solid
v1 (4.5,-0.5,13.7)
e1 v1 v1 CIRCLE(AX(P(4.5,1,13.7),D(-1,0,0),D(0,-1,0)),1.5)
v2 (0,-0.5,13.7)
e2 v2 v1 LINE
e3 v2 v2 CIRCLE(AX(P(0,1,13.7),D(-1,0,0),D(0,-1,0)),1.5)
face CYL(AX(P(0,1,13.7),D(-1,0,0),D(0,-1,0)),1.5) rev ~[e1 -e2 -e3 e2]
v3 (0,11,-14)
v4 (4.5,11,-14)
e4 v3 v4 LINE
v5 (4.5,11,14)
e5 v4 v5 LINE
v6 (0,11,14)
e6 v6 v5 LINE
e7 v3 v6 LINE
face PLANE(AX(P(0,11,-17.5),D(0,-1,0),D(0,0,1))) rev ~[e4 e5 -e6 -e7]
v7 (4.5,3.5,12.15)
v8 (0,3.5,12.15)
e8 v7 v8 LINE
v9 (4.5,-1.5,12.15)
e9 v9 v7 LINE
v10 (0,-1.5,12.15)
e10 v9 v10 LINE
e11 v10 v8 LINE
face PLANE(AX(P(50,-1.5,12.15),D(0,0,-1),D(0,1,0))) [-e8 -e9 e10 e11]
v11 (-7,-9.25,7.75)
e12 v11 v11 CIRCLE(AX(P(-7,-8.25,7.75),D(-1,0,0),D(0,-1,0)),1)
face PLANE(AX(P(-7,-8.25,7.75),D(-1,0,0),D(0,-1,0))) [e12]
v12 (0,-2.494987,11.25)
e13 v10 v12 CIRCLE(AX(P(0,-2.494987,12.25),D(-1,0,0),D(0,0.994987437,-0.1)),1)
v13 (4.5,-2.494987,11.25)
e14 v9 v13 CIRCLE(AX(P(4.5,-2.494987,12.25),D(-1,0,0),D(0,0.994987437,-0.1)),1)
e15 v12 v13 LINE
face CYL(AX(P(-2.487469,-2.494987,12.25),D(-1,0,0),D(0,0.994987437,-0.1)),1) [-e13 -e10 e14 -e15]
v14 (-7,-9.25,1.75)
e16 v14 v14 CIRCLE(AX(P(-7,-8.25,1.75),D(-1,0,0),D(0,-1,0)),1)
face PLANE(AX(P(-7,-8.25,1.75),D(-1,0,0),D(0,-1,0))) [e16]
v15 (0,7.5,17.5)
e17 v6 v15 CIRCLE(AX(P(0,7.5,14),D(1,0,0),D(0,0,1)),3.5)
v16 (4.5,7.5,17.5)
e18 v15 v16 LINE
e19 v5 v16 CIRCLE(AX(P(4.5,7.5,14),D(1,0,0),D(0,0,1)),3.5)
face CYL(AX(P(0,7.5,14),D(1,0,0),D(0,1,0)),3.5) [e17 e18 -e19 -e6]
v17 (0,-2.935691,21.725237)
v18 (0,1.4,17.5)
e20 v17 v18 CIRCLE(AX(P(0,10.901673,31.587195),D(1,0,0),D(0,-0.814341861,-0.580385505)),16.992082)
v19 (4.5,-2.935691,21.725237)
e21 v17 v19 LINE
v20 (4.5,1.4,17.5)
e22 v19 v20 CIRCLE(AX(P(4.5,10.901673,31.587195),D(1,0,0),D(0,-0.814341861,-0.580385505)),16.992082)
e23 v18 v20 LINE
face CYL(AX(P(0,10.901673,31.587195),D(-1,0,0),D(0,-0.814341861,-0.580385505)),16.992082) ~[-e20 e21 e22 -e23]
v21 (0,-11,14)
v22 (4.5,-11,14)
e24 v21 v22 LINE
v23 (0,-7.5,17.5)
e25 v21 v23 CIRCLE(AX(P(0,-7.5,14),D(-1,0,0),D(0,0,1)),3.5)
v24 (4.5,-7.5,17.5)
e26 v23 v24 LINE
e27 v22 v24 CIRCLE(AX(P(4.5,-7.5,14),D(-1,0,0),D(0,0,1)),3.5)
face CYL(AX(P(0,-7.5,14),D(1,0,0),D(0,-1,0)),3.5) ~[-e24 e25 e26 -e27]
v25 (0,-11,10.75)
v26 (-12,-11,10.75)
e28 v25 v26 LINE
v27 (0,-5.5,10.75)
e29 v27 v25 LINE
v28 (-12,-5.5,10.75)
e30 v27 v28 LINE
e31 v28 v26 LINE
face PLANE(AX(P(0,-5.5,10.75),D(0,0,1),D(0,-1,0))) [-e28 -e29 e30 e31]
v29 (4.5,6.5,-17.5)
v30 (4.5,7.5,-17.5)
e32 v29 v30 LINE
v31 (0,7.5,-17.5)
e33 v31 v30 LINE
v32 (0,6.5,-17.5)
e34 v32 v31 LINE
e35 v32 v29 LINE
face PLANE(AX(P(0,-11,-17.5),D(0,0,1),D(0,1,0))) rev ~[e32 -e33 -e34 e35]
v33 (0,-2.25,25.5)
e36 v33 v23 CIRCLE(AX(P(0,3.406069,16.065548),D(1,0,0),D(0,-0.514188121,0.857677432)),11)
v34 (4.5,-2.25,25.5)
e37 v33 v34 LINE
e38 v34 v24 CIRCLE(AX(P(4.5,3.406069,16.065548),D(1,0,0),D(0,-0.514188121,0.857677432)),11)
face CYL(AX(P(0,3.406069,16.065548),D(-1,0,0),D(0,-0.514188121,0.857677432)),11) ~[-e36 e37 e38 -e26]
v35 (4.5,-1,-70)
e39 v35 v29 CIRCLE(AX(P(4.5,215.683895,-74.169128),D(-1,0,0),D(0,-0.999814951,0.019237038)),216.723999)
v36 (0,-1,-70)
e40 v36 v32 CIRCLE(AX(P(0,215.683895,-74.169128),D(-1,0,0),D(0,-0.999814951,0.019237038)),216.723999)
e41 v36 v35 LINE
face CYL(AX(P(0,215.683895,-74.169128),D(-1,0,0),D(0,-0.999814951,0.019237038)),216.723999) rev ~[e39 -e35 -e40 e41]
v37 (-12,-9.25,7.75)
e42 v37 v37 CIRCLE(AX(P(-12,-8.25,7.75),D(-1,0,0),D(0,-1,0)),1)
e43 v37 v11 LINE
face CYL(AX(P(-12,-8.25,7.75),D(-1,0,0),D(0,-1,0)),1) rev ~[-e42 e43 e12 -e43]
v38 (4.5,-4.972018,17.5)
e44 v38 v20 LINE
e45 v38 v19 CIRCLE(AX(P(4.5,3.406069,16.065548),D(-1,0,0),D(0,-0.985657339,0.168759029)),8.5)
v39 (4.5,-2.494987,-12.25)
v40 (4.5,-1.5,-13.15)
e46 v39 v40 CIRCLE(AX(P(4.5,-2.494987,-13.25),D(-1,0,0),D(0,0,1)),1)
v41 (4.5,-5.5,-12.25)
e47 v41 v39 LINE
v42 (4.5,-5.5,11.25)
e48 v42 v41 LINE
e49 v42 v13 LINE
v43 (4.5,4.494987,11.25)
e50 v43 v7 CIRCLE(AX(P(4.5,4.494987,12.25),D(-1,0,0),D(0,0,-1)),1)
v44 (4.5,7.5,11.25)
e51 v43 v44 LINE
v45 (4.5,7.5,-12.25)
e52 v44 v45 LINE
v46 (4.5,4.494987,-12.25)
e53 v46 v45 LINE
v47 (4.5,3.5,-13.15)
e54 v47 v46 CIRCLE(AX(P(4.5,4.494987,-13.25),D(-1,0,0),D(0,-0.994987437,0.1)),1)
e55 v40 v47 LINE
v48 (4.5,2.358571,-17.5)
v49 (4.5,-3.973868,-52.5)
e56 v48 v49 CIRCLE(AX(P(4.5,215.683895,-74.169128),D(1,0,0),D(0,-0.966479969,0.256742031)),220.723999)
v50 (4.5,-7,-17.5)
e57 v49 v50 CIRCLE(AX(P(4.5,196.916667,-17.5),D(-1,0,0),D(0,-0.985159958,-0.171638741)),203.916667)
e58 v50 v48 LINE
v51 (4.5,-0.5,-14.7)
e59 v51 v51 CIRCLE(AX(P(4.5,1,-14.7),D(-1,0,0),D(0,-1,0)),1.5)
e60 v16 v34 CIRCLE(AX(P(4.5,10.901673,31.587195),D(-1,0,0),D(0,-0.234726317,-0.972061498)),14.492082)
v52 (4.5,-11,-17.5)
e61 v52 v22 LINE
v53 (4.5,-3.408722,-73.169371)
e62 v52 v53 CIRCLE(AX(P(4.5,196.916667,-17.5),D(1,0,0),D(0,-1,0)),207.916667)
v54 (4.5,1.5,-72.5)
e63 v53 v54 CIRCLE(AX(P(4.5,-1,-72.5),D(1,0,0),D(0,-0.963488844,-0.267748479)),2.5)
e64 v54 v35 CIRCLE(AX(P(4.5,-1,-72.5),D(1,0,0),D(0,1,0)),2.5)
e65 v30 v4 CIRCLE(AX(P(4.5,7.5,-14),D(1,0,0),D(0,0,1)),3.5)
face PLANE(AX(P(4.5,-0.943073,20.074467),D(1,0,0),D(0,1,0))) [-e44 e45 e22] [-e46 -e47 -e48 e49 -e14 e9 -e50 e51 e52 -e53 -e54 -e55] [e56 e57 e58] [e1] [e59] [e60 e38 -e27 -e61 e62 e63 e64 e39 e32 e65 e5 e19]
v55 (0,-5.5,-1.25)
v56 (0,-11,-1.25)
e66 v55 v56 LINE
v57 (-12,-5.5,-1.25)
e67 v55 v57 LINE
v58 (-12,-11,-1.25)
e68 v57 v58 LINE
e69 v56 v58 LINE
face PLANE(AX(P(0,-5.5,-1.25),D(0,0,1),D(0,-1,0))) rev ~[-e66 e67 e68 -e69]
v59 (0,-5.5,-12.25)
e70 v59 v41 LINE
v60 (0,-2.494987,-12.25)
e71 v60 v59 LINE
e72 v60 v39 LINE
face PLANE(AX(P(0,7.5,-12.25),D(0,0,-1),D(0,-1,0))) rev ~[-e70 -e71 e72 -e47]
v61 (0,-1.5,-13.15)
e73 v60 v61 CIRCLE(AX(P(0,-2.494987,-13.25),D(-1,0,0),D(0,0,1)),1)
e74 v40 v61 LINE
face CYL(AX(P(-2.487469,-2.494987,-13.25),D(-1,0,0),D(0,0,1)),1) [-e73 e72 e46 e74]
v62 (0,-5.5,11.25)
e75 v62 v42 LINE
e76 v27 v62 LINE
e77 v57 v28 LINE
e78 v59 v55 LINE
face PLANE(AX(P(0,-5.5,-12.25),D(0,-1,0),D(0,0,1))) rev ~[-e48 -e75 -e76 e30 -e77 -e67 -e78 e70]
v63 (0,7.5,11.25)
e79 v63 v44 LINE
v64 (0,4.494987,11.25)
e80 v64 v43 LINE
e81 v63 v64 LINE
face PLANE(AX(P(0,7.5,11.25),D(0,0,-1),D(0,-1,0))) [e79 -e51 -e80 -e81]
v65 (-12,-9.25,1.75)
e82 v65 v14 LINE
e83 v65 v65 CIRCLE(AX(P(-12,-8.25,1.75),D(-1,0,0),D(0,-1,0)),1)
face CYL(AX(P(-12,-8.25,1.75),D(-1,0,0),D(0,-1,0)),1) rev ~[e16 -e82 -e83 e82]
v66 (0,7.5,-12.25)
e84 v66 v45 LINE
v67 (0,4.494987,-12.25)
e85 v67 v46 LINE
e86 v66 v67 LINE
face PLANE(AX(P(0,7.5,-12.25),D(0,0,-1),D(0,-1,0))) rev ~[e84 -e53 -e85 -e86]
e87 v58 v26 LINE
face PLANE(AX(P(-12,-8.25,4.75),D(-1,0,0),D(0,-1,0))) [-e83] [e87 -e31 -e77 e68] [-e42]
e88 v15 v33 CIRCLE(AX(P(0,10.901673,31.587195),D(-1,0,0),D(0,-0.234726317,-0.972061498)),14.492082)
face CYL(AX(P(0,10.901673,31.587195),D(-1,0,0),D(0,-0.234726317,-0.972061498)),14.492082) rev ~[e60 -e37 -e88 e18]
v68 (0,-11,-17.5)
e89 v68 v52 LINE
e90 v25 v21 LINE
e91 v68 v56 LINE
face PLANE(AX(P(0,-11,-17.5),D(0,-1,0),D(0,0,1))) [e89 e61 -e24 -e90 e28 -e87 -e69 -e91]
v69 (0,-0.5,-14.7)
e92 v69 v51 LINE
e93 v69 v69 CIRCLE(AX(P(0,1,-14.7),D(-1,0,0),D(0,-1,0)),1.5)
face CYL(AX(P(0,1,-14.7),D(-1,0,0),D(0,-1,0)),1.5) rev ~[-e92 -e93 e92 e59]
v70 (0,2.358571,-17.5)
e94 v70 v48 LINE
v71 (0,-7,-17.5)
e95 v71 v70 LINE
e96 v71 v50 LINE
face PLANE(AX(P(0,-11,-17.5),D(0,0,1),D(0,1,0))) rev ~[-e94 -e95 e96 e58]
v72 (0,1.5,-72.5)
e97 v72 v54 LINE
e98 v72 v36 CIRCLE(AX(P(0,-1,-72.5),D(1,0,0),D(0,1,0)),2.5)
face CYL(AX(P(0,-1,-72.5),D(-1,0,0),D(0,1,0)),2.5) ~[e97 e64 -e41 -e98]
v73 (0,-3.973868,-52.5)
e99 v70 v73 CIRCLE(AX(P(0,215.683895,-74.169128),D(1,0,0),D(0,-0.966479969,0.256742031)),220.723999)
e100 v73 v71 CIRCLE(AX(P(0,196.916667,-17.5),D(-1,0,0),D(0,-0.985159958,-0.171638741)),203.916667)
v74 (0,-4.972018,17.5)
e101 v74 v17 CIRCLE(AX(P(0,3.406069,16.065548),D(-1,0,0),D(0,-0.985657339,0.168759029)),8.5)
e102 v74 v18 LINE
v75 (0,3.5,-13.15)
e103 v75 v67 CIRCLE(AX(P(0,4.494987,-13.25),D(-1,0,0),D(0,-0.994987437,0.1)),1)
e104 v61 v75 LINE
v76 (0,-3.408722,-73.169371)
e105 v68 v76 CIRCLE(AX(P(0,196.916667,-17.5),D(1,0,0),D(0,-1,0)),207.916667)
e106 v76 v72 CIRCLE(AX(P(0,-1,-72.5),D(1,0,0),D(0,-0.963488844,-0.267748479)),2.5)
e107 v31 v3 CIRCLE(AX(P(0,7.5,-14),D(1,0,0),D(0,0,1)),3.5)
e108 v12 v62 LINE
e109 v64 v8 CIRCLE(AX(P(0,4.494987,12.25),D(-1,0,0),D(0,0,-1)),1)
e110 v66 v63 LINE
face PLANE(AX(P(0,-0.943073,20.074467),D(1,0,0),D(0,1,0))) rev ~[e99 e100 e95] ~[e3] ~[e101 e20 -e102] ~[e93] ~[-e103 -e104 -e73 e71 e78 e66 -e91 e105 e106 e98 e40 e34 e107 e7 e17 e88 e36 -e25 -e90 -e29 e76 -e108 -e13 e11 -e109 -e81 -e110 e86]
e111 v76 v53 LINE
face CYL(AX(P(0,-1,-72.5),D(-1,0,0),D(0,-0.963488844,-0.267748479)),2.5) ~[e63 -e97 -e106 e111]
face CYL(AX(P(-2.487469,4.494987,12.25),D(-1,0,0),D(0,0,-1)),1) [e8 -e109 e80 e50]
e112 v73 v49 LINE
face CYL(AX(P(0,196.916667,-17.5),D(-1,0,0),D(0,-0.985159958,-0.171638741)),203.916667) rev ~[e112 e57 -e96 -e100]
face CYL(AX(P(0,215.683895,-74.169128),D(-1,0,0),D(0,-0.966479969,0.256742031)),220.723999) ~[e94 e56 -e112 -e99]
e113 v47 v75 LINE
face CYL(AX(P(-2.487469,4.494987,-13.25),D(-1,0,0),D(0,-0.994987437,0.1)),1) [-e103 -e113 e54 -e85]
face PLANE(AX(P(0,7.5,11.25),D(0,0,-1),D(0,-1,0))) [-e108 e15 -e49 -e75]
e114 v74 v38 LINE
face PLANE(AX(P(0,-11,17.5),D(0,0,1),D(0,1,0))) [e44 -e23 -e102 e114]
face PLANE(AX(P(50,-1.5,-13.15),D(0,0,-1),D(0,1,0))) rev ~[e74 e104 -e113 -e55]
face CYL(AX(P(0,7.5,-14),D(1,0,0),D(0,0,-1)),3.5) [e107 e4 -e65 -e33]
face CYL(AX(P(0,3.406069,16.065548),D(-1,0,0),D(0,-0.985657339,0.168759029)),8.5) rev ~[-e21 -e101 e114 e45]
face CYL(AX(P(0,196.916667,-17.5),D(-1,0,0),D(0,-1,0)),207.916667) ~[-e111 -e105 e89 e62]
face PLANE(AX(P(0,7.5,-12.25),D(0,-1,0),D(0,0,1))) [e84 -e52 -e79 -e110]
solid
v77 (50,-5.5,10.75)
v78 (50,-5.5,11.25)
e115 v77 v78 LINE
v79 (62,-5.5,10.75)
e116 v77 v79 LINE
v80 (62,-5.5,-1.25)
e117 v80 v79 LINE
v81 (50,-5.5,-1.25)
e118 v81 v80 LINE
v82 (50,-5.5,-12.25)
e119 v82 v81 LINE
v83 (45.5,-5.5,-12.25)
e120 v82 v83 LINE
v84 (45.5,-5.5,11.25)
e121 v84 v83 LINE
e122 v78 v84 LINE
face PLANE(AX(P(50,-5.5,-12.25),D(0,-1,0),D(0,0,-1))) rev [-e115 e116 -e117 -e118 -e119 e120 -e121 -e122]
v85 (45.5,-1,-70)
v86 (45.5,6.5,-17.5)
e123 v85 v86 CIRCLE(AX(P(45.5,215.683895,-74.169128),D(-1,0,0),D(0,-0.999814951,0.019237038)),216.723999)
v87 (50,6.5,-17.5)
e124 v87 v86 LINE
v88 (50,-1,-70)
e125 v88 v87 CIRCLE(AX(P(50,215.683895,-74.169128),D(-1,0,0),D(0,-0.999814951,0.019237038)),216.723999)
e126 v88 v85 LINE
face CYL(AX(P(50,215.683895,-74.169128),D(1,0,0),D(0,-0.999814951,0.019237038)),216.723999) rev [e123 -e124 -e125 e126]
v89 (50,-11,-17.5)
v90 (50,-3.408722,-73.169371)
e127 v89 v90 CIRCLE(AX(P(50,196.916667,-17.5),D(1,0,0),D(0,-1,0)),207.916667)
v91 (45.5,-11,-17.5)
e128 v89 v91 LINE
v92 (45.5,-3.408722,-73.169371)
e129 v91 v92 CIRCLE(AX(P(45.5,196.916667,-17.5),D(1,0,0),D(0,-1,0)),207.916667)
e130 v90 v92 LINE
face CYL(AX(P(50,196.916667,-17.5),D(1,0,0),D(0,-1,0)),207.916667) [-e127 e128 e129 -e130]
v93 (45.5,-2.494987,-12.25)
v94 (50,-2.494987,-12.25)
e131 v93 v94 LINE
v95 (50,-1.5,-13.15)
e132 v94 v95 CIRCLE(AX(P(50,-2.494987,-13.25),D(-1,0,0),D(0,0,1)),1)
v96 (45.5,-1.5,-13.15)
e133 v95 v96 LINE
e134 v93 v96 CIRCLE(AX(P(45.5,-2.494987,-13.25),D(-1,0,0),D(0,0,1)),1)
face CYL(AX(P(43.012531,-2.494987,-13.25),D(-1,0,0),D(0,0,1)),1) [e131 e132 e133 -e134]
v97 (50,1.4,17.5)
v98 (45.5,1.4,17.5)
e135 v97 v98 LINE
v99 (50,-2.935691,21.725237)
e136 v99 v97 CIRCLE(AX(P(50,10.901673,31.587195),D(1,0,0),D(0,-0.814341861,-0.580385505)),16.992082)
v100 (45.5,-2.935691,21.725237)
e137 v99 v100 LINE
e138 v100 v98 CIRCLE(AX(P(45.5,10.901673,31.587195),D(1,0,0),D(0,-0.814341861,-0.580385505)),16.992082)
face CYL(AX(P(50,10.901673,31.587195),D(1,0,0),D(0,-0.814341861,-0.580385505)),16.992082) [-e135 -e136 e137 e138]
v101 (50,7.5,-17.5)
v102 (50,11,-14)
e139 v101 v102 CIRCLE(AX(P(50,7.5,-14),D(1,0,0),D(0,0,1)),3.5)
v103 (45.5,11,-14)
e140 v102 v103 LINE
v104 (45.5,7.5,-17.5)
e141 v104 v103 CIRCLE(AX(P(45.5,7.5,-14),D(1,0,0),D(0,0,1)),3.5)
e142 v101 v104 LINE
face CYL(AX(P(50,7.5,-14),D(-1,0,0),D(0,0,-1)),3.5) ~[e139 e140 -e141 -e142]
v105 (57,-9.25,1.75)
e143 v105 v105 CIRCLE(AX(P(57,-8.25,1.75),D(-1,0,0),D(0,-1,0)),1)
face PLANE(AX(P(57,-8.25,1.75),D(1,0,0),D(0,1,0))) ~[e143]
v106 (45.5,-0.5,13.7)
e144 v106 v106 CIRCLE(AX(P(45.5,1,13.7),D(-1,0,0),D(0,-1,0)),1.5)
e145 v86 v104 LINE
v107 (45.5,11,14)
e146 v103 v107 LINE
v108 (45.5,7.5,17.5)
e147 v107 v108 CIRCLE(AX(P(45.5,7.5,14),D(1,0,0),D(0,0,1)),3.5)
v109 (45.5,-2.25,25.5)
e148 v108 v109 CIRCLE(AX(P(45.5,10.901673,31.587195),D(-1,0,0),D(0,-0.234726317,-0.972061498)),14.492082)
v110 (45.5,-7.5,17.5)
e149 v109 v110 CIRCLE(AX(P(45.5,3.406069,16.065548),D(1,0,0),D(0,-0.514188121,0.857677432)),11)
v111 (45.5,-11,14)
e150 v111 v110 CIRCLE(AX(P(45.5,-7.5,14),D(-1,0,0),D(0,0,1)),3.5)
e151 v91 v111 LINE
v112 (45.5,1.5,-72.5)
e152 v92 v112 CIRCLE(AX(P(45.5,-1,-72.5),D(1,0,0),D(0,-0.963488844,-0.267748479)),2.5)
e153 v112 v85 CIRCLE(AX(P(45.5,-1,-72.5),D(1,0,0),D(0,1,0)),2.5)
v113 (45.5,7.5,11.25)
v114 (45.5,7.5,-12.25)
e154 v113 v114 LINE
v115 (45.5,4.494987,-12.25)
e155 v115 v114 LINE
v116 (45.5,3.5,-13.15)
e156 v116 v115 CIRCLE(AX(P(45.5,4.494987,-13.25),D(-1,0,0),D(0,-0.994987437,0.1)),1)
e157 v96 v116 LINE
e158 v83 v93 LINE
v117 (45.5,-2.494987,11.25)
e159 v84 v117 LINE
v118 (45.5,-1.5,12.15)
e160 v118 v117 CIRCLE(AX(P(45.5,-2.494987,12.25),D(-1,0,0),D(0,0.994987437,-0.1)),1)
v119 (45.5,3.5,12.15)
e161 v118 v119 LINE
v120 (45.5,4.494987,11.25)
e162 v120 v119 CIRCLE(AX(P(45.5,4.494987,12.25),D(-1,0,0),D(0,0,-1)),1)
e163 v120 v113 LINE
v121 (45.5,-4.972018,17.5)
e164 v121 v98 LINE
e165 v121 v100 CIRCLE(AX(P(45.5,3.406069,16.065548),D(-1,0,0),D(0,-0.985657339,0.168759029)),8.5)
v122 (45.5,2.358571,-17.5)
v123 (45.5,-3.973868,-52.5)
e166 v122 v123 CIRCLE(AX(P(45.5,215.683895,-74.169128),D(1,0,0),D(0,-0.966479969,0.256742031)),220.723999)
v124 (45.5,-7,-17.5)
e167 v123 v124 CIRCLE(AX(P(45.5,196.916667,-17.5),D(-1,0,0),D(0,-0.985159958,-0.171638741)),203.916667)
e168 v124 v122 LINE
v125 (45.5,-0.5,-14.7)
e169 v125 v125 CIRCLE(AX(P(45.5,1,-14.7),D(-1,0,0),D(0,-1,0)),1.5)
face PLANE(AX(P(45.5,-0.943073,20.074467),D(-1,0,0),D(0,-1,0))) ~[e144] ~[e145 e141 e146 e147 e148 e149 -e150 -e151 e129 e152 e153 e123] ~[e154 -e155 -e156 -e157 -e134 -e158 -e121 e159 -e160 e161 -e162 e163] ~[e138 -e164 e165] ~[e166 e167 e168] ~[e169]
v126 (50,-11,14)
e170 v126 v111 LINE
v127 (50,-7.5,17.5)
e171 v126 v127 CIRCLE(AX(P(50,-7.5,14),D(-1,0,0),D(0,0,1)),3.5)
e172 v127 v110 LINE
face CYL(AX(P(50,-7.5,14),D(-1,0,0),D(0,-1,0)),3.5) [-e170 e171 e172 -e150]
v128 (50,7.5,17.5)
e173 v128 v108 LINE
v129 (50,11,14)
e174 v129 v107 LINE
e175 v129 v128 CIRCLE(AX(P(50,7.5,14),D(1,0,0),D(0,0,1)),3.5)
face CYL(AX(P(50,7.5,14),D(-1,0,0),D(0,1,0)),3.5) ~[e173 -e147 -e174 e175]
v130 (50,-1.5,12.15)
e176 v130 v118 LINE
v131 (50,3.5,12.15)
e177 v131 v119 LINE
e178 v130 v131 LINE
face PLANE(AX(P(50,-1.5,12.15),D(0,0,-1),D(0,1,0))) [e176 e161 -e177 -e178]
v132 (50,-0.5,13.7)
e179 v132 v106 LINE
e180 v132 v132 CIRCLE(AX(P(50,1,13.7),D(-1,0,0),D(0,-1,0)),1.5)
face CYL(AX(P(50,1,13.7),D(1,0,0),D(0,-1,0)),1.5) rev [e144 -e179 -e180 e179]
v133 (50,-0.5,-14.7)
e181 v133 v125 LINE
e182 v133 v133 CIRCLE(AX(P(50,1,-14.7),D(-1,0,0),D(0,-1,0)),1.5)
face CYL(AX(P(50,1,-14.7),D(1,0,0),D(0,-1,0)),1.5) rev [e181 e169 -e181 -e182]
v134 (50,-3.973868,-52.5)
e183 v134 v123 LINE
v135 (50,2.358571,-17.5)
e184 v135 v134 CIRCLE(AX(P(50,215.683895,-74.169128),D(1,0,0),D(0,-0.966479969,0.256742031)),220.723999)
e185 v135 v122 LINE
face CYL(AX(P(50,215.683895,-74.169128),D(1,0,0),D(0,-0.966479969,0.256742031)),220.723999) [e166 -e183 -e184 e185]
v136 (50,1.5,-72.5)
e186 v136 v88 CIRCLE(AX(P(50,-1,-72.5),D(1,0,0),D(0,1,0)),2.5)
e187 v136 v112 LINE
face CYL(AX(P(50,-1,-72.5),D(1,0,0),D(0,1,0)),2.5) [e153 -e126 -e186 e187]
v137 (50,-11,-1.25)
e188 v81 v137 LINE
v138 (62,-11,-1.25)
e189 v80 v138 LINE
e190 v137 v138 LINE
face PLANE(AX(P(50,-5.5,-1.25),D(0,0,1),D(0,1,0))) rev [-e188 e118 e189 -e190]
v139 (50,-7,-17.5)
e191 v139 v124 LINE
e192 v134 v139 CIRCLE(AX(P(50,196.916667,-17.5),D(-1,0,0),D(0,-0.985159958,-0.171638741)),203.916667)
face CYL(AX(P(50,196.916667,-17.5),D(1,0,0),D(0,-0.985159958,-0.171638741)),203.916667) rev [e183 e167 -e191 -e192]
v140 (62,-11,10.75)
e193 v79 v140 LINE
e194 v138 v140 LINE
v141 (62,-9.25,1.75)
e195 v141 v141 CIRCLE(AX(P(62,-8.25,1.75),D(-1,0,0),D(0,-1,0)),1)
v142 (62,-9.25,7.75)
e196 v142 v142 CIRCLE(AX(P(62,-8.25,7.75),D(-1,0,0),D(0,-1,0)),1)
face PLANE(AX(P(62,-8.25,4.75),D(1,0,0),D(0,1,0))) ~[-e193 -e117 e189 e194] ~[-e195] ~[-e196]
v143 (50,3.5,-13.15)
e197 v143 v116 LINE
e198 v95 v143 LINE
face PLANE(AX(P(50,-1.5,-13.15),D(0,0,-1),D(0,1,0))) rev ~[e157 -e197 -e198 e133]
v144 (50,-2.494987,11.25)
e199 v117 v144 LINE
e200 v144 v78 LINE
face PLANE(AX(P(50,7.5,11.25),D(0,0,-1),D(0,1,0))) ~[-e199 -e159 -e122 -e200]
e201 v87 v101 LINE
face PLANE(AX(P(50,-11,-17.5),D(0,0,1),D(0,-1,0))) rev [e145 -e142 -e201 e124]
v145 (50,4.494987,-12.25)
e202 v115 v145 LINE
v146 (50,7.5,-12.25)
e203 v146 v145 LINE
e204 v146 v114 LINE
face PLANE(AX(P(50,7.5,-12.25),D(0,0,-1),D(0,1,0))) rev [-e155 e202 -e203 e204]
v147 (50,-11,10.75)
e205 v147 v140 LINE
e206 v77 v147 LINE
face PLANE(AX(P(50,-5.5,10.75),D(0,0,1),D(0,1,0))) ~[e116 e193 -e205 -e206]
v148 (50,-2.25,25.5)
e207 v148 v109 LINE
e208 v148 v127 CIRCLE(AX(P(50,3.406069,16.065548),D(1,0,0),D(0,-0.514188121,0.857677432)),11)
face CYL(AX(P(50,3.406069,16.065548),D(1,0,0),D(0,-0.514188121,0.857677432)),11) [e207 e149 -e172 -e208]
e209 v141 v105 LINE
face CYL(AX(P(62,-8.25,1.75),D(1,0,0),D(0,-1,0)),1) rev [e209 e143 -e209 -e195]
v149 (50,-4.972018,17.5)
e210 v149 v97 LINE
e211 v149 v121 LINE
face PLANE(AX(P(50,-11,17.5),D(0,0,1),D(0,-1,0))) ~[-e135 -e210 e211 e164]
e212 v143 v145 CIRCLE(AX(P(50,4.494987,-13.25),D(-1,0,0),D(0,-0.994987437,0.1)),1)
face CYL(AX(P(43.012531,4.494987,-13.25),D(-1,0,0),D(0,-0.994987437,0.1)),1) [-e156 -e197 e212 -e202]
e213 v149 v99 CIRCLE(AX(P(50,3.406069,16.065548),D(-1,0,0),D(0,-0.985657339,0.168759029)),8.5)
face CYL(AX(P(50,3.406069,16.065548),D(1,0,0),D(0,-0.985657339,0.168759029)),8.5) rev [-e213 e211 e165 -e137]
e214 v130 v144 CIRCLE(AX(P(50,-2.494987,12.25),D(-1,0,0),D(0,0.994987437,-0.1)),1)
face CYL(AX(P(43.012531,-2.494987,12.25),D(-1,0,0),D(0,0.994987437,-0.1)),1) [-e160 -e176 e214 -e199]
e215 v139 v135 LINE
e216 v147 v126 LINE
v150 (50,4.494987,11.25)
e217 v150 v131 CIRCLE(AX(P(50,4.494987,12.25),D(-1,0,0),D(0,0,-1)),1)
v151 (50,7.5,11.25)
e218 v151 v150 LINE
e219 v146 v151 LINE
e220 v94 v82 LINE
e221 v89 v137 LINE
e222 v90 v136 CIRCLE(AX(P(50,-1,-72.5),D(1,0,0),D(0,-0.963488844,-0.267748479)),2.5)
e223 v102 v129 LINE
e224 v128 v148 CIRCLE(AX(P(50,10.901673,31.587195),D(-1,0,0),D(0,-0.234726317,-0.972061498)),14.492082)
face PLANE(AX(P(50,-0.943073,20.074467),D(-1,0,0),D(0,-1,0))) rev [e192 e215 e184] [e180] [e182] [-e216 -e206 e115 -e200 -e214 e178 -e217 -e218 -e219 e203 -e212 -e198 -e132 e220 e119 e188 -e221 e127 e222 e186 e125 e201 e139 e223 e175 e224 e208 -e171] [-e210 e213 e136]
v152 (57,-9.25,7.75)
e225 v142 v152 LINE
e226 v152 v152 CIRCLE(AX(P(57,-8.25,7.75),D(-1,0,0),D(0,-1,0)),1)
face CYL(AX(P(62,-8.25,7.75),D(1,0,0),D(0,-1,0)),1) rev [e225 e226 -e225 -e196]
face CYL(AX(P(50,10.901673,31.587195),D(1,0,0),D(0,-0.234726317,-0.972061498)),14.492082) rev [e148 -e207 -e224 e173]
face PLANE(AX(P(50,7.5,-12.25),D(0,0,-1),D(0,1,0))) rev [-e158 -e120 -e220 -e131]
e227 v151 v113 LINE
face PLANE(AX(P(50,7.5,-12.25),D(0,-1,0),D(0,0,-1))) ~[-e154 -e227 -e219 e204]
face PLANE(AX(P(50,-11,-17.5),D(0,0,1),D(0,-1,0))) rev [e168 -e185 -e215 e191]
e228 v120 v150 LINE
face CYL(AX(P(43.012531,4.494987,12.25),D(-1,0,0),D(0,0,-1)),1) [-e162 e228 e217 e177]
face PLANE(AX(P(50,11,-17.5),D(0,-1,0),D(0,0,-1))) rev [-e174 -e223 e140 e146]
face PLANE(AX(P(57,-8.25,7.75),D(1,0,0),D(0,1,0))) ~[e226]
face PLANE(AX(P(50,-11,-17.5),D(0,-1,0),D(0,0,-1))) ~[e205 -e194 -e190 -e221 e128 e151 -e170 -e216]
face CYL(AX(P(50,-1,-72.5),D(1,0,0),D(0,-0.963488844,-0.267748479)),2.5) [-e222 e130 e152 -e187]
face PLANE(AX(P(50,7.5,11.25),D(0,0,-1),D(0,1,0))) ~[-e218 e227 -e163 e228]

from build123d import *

# Parameters (mm, degrees)
F0_W           = 22
F0_H           = 35
F1_DEPTH       = 4.5
F3_DEPTH       = 4.5
F4_R           = 3.5
F6_DEPTH       = 4.5
F7_W           = 5.5
F7_H           = 12
F8_DEPTH       = 12
F9_W           = 13
F9_H           = 23.5
F10_DEPTH      = 25
F11_R          = 1.5
F12_DEPTH      = 25
F13_R          = 1
F14_DEPTH      = 5
F17_W          = 5
F17_H          = 0.9
F18_DEPTH      = 60
F19_T1_DEPTH   = 9.4749371855
F19_2_T1_DEPTH = 9.4749371855


# Not quite as in the source:
# - a fillet or chamfer that OpenCascade refuses, or shapes differently, is made with other operations: its cross-section is extruded or revolved along the edge and cut away or added


with BuildPart() as f1:
    # F0 (on Right) → F1 (new body)
    with BuildSketch(Plane.YZ):
        Rectangle(F0_W, F0_H)
    extrude(amount=F1_DEPTH)

    # F2 (on Right) → F3 (join, through all)
    with BuildSketch(Plane.YZ):
        with BuildLine():
            ThreePointArc((-3.4087221095, -73.1693711968), (-2.9904054853, -70.9872918312), (-1, -70))
            ThreePointArc((-1, -70), (1.1380813831, -43.5197259119), (6.5, -17.5))
            Line((6.5, -17.5), (2.3585708498, -17.5))
            ThreePointArc((2.3585708498, -17.5), (-1.5137994024, -34.8722383779), (-3.9738680642, -52.5))
            ThreePointArc((-3.9738680642, -52.5), (-6.2420584126, -35.065288743), (-7, -17.5))
            Line((-7, -17.5), (-11, -17.5))
            ThreePointArc((-11, -17.5), (-9.0934391059, -45.5922871508), (-3.4087221095, -73.1693711968))
        make_face()
        with BuildLine():
            ThreePointArc((-3.4087221095, -73.1693711968), (-0.6622169882, -74.9770754201), (1.5, -72.5))
            ThreePointArc((1.5, -72.5), (0.767766953, -70.732233047), (-1, -70))
            ThreePointArc((-1, -70), (-2.9904054853, -70.9872918312), (-3.4087221095, -73.1693711968))
        make_face()
    extrude(amount=F3_DEPTH)

    # F4
    f4_edges = [f1.edges().sort_by_distance(p)[0] for p in [
        (2.25, -11, 17.5),
        (2.25, 11, 17.5),
        (2.25, 11, -17.5),
    ]]
    fillet(f4_edges, radius=F4_R)

    # F5 (on Right) → F6 (join, through all)
    with BuildSketch(Plane.YZ):
        with BuildLine():
            Line((1.4, 17.5), (7.5, 17.5))
            ThreePointArc((7.5, 17.5), (1.7091044965, 20.3837523551), (-2.25, 25.5))
            ThreePointArc((-2.25, 25.5), (-5.7904576912, 22.1007691099), (-7.5, 17.5))
            Line((-7.5, 17.5), (-4.9720180544, 17.5))
            ThreePointArc((-4.9720180544, 17.5), (-4.2510603876, 19.7558550861), (-2.9356909086, 21.7252370349))
            ThreePointArc((-2.9356909086, 21.7252370349), (-0.9575351482, 19.4179700576), (1.4, 17.5))
        make_face()
    extrude(amount=F6_DEPTH)

    # F7 (on face) → F8 (join)
    with BuildSketch(Plane(origin=(0, 0, 0), x_dir=(0, -1, 0), z_dir=(-1, 0, 0))):
        with Locations((8.25, 4.75)):
            Rectangle(F7_W, F7_H)
    extrude(amount=F8_DEPTH)

    # F9 (on face) → F10 (cut)
    with BuildSketch(Plane(origin=(0, 0, 0), x_dir=(0, -1, 0), z_dir=(-1, 0, 0))):
        with Locations((-1, -0.5)):
            Rectangle(F9_W, F9_H)
    extrude(amount=-F10_DEPTH, mode=Mode.SUBTRACT)

    # F11 (on face) → F12 (cut)
    with BuildSketch(Plane(origin=(0, 0, 0), x_dir=(0, -1, 0), z_dir=(-1, 0, 0))):
        with Locations((-1, 13.7)):
            Circle(F11_R)
        with Locations((-1, -14.7)):
            Circle(F11_R)
    extrude(amount=-F12_DEPTH, mode=Mode.SUBTRACT)

    # F13 (on face) → F14 (cut)
    with BuildSketch(Plane(origin=(-12, 0, 0), x_dir=(0, -1, 0), z_dir=(-1, 0, 0))):
        with Locations((8.25, 7.75)):
            Circle(F13_R)
        with Locations((8.25, 1.75)):
            Circle(F13_R)
    extrude(amount=-F14_DEPTH, mode=Mode.SUBTRACT)


with BuildPart() as f16_1:
    # F16: instance of F1
    add(f1.part.mirror(Plane.YZ.offset(25)))


with BuildPart() as f18_tool:
    # F17 (on face) → F18 (new body)
    with BuildSketch(Plane.YZ.offset(50)):
        with Locations((1, 11.7)):
            Rectangle(F17_W, F17_H)
        with Locations((1, -12.7)):
            Rectangle(F17_W, F17_H)
    extrude(amount=-F18_DEPTH)


with BuildPart() as f1_1:
    add(f1.part)

    # F18: cut by f18_tool
    add(f18_tool.part, mode=Mode.SUBTRACT)

    # F19: fillet of radius 1 on 4 edges, made by hand

    # F19_s2 → F19_t1 (cut)
    with BuildSketch(Plane.YZ.offset(-2.4874685928)):
        with BuildLine():
            ThreePointArc((-1.5, 12.15), (-1.8241670439, 11.5083801513), (-2.4949874371, 11.25))
            Line((-2.4949874371, 11.25), (-1.5, 11.25))
            Line((-1.5, 11.25), (-1.5, 12.15))
        make_face()
        with BuildLine():
            ThreePointArc((4.4949874371, 11.25), (3.8241670439, 11.5083801513), (3.5, 12.15))
            Line((3.5, 12.15), (3.5, 11.25))
            Line((3.5, 11.25), (4.4949874371, 11.25))
        make_face()
        with BuildLine():
            ThreePointArc((3.5, -13.15), (3.8241670439, -12.5083801513), (4.4949874371, -12.25))
            Line((4.4949874371, -12.25), (3.5, -12.25))
            Line((3.5, -12.25), (3.5, -13.15))
        make_face()
        with BuildLine():
            ThreePointArc((-2.4949874371, -12.25), (-1.8241670439, -12.5083801513), (-1.5, -13.15))
            Line((-1.5, -13.15), (-1.5, -12.25))
            Line((-1.5, -12.25), (-2.4949874371, -12.25))
        make_face()
    extrude(amount=F19_T1_DEPTH, mode=Mode.SUBTRACT)


with BuildPart() as f16_1_1:
    add(f16_1.part)

    # F18: cut by f18_tool
    add(f18_tool.part, mode=Mode.SUBTRACT)

    # F19#2: fillet of radius 1 on 4 edges, made by hand

    # F19_2_s2 → F19_2_t1 (cut)
    with BuildSketch(Plane.YZ.offset(43.0125314072)):
        with BuildLine():
            ThreePointArc((-1.5, 12.15), (-1.8241670439, 11.5083801513), (-2.4949874371, 11.25))
            Line((-2.4949874371, 11.25), (-1.5, 11.25))
            Line((-1.5, 11.25), (-1.5, 12.15))
        make_face()
        with BuildLine():
            ThreePointArc((4.4949874371, 11.25), (3.8241670439, 11.5083801513), (3.5, 12.15))
            Line((3.5, 12.15), (3.5, 11.25))
            Line((3.5, 11.25), (4.4949874371, 11.25))
        make_face()
        with BuildLine():
            ThreePointArc((-2.4949874371, -12.25), (-1.8241670439, -12.5083801513), (-1.5, -13.15))
            Line((-1.5, -13.15), (-1.5, -12.25))
            Line((-1.5, -12.25), (-2.4949874371, -12.25))
        make_face()
        with BuildLine():
            ThreePointArc((3.5, -13.15), (3.8241670439, -12.5083801513), (4.4949874371, -12.25))
            Line((4.4949874371, -12.25), (3.5, -12.25))
            Line((3.5, -12.25), (3.5, -13.15))
        make_face()
    extrude(amount=F19_2_T1_DEPTH, mode=Mode.SUBTRACT)


solid = Compound([f1_1.part, f16_1_1.part])
